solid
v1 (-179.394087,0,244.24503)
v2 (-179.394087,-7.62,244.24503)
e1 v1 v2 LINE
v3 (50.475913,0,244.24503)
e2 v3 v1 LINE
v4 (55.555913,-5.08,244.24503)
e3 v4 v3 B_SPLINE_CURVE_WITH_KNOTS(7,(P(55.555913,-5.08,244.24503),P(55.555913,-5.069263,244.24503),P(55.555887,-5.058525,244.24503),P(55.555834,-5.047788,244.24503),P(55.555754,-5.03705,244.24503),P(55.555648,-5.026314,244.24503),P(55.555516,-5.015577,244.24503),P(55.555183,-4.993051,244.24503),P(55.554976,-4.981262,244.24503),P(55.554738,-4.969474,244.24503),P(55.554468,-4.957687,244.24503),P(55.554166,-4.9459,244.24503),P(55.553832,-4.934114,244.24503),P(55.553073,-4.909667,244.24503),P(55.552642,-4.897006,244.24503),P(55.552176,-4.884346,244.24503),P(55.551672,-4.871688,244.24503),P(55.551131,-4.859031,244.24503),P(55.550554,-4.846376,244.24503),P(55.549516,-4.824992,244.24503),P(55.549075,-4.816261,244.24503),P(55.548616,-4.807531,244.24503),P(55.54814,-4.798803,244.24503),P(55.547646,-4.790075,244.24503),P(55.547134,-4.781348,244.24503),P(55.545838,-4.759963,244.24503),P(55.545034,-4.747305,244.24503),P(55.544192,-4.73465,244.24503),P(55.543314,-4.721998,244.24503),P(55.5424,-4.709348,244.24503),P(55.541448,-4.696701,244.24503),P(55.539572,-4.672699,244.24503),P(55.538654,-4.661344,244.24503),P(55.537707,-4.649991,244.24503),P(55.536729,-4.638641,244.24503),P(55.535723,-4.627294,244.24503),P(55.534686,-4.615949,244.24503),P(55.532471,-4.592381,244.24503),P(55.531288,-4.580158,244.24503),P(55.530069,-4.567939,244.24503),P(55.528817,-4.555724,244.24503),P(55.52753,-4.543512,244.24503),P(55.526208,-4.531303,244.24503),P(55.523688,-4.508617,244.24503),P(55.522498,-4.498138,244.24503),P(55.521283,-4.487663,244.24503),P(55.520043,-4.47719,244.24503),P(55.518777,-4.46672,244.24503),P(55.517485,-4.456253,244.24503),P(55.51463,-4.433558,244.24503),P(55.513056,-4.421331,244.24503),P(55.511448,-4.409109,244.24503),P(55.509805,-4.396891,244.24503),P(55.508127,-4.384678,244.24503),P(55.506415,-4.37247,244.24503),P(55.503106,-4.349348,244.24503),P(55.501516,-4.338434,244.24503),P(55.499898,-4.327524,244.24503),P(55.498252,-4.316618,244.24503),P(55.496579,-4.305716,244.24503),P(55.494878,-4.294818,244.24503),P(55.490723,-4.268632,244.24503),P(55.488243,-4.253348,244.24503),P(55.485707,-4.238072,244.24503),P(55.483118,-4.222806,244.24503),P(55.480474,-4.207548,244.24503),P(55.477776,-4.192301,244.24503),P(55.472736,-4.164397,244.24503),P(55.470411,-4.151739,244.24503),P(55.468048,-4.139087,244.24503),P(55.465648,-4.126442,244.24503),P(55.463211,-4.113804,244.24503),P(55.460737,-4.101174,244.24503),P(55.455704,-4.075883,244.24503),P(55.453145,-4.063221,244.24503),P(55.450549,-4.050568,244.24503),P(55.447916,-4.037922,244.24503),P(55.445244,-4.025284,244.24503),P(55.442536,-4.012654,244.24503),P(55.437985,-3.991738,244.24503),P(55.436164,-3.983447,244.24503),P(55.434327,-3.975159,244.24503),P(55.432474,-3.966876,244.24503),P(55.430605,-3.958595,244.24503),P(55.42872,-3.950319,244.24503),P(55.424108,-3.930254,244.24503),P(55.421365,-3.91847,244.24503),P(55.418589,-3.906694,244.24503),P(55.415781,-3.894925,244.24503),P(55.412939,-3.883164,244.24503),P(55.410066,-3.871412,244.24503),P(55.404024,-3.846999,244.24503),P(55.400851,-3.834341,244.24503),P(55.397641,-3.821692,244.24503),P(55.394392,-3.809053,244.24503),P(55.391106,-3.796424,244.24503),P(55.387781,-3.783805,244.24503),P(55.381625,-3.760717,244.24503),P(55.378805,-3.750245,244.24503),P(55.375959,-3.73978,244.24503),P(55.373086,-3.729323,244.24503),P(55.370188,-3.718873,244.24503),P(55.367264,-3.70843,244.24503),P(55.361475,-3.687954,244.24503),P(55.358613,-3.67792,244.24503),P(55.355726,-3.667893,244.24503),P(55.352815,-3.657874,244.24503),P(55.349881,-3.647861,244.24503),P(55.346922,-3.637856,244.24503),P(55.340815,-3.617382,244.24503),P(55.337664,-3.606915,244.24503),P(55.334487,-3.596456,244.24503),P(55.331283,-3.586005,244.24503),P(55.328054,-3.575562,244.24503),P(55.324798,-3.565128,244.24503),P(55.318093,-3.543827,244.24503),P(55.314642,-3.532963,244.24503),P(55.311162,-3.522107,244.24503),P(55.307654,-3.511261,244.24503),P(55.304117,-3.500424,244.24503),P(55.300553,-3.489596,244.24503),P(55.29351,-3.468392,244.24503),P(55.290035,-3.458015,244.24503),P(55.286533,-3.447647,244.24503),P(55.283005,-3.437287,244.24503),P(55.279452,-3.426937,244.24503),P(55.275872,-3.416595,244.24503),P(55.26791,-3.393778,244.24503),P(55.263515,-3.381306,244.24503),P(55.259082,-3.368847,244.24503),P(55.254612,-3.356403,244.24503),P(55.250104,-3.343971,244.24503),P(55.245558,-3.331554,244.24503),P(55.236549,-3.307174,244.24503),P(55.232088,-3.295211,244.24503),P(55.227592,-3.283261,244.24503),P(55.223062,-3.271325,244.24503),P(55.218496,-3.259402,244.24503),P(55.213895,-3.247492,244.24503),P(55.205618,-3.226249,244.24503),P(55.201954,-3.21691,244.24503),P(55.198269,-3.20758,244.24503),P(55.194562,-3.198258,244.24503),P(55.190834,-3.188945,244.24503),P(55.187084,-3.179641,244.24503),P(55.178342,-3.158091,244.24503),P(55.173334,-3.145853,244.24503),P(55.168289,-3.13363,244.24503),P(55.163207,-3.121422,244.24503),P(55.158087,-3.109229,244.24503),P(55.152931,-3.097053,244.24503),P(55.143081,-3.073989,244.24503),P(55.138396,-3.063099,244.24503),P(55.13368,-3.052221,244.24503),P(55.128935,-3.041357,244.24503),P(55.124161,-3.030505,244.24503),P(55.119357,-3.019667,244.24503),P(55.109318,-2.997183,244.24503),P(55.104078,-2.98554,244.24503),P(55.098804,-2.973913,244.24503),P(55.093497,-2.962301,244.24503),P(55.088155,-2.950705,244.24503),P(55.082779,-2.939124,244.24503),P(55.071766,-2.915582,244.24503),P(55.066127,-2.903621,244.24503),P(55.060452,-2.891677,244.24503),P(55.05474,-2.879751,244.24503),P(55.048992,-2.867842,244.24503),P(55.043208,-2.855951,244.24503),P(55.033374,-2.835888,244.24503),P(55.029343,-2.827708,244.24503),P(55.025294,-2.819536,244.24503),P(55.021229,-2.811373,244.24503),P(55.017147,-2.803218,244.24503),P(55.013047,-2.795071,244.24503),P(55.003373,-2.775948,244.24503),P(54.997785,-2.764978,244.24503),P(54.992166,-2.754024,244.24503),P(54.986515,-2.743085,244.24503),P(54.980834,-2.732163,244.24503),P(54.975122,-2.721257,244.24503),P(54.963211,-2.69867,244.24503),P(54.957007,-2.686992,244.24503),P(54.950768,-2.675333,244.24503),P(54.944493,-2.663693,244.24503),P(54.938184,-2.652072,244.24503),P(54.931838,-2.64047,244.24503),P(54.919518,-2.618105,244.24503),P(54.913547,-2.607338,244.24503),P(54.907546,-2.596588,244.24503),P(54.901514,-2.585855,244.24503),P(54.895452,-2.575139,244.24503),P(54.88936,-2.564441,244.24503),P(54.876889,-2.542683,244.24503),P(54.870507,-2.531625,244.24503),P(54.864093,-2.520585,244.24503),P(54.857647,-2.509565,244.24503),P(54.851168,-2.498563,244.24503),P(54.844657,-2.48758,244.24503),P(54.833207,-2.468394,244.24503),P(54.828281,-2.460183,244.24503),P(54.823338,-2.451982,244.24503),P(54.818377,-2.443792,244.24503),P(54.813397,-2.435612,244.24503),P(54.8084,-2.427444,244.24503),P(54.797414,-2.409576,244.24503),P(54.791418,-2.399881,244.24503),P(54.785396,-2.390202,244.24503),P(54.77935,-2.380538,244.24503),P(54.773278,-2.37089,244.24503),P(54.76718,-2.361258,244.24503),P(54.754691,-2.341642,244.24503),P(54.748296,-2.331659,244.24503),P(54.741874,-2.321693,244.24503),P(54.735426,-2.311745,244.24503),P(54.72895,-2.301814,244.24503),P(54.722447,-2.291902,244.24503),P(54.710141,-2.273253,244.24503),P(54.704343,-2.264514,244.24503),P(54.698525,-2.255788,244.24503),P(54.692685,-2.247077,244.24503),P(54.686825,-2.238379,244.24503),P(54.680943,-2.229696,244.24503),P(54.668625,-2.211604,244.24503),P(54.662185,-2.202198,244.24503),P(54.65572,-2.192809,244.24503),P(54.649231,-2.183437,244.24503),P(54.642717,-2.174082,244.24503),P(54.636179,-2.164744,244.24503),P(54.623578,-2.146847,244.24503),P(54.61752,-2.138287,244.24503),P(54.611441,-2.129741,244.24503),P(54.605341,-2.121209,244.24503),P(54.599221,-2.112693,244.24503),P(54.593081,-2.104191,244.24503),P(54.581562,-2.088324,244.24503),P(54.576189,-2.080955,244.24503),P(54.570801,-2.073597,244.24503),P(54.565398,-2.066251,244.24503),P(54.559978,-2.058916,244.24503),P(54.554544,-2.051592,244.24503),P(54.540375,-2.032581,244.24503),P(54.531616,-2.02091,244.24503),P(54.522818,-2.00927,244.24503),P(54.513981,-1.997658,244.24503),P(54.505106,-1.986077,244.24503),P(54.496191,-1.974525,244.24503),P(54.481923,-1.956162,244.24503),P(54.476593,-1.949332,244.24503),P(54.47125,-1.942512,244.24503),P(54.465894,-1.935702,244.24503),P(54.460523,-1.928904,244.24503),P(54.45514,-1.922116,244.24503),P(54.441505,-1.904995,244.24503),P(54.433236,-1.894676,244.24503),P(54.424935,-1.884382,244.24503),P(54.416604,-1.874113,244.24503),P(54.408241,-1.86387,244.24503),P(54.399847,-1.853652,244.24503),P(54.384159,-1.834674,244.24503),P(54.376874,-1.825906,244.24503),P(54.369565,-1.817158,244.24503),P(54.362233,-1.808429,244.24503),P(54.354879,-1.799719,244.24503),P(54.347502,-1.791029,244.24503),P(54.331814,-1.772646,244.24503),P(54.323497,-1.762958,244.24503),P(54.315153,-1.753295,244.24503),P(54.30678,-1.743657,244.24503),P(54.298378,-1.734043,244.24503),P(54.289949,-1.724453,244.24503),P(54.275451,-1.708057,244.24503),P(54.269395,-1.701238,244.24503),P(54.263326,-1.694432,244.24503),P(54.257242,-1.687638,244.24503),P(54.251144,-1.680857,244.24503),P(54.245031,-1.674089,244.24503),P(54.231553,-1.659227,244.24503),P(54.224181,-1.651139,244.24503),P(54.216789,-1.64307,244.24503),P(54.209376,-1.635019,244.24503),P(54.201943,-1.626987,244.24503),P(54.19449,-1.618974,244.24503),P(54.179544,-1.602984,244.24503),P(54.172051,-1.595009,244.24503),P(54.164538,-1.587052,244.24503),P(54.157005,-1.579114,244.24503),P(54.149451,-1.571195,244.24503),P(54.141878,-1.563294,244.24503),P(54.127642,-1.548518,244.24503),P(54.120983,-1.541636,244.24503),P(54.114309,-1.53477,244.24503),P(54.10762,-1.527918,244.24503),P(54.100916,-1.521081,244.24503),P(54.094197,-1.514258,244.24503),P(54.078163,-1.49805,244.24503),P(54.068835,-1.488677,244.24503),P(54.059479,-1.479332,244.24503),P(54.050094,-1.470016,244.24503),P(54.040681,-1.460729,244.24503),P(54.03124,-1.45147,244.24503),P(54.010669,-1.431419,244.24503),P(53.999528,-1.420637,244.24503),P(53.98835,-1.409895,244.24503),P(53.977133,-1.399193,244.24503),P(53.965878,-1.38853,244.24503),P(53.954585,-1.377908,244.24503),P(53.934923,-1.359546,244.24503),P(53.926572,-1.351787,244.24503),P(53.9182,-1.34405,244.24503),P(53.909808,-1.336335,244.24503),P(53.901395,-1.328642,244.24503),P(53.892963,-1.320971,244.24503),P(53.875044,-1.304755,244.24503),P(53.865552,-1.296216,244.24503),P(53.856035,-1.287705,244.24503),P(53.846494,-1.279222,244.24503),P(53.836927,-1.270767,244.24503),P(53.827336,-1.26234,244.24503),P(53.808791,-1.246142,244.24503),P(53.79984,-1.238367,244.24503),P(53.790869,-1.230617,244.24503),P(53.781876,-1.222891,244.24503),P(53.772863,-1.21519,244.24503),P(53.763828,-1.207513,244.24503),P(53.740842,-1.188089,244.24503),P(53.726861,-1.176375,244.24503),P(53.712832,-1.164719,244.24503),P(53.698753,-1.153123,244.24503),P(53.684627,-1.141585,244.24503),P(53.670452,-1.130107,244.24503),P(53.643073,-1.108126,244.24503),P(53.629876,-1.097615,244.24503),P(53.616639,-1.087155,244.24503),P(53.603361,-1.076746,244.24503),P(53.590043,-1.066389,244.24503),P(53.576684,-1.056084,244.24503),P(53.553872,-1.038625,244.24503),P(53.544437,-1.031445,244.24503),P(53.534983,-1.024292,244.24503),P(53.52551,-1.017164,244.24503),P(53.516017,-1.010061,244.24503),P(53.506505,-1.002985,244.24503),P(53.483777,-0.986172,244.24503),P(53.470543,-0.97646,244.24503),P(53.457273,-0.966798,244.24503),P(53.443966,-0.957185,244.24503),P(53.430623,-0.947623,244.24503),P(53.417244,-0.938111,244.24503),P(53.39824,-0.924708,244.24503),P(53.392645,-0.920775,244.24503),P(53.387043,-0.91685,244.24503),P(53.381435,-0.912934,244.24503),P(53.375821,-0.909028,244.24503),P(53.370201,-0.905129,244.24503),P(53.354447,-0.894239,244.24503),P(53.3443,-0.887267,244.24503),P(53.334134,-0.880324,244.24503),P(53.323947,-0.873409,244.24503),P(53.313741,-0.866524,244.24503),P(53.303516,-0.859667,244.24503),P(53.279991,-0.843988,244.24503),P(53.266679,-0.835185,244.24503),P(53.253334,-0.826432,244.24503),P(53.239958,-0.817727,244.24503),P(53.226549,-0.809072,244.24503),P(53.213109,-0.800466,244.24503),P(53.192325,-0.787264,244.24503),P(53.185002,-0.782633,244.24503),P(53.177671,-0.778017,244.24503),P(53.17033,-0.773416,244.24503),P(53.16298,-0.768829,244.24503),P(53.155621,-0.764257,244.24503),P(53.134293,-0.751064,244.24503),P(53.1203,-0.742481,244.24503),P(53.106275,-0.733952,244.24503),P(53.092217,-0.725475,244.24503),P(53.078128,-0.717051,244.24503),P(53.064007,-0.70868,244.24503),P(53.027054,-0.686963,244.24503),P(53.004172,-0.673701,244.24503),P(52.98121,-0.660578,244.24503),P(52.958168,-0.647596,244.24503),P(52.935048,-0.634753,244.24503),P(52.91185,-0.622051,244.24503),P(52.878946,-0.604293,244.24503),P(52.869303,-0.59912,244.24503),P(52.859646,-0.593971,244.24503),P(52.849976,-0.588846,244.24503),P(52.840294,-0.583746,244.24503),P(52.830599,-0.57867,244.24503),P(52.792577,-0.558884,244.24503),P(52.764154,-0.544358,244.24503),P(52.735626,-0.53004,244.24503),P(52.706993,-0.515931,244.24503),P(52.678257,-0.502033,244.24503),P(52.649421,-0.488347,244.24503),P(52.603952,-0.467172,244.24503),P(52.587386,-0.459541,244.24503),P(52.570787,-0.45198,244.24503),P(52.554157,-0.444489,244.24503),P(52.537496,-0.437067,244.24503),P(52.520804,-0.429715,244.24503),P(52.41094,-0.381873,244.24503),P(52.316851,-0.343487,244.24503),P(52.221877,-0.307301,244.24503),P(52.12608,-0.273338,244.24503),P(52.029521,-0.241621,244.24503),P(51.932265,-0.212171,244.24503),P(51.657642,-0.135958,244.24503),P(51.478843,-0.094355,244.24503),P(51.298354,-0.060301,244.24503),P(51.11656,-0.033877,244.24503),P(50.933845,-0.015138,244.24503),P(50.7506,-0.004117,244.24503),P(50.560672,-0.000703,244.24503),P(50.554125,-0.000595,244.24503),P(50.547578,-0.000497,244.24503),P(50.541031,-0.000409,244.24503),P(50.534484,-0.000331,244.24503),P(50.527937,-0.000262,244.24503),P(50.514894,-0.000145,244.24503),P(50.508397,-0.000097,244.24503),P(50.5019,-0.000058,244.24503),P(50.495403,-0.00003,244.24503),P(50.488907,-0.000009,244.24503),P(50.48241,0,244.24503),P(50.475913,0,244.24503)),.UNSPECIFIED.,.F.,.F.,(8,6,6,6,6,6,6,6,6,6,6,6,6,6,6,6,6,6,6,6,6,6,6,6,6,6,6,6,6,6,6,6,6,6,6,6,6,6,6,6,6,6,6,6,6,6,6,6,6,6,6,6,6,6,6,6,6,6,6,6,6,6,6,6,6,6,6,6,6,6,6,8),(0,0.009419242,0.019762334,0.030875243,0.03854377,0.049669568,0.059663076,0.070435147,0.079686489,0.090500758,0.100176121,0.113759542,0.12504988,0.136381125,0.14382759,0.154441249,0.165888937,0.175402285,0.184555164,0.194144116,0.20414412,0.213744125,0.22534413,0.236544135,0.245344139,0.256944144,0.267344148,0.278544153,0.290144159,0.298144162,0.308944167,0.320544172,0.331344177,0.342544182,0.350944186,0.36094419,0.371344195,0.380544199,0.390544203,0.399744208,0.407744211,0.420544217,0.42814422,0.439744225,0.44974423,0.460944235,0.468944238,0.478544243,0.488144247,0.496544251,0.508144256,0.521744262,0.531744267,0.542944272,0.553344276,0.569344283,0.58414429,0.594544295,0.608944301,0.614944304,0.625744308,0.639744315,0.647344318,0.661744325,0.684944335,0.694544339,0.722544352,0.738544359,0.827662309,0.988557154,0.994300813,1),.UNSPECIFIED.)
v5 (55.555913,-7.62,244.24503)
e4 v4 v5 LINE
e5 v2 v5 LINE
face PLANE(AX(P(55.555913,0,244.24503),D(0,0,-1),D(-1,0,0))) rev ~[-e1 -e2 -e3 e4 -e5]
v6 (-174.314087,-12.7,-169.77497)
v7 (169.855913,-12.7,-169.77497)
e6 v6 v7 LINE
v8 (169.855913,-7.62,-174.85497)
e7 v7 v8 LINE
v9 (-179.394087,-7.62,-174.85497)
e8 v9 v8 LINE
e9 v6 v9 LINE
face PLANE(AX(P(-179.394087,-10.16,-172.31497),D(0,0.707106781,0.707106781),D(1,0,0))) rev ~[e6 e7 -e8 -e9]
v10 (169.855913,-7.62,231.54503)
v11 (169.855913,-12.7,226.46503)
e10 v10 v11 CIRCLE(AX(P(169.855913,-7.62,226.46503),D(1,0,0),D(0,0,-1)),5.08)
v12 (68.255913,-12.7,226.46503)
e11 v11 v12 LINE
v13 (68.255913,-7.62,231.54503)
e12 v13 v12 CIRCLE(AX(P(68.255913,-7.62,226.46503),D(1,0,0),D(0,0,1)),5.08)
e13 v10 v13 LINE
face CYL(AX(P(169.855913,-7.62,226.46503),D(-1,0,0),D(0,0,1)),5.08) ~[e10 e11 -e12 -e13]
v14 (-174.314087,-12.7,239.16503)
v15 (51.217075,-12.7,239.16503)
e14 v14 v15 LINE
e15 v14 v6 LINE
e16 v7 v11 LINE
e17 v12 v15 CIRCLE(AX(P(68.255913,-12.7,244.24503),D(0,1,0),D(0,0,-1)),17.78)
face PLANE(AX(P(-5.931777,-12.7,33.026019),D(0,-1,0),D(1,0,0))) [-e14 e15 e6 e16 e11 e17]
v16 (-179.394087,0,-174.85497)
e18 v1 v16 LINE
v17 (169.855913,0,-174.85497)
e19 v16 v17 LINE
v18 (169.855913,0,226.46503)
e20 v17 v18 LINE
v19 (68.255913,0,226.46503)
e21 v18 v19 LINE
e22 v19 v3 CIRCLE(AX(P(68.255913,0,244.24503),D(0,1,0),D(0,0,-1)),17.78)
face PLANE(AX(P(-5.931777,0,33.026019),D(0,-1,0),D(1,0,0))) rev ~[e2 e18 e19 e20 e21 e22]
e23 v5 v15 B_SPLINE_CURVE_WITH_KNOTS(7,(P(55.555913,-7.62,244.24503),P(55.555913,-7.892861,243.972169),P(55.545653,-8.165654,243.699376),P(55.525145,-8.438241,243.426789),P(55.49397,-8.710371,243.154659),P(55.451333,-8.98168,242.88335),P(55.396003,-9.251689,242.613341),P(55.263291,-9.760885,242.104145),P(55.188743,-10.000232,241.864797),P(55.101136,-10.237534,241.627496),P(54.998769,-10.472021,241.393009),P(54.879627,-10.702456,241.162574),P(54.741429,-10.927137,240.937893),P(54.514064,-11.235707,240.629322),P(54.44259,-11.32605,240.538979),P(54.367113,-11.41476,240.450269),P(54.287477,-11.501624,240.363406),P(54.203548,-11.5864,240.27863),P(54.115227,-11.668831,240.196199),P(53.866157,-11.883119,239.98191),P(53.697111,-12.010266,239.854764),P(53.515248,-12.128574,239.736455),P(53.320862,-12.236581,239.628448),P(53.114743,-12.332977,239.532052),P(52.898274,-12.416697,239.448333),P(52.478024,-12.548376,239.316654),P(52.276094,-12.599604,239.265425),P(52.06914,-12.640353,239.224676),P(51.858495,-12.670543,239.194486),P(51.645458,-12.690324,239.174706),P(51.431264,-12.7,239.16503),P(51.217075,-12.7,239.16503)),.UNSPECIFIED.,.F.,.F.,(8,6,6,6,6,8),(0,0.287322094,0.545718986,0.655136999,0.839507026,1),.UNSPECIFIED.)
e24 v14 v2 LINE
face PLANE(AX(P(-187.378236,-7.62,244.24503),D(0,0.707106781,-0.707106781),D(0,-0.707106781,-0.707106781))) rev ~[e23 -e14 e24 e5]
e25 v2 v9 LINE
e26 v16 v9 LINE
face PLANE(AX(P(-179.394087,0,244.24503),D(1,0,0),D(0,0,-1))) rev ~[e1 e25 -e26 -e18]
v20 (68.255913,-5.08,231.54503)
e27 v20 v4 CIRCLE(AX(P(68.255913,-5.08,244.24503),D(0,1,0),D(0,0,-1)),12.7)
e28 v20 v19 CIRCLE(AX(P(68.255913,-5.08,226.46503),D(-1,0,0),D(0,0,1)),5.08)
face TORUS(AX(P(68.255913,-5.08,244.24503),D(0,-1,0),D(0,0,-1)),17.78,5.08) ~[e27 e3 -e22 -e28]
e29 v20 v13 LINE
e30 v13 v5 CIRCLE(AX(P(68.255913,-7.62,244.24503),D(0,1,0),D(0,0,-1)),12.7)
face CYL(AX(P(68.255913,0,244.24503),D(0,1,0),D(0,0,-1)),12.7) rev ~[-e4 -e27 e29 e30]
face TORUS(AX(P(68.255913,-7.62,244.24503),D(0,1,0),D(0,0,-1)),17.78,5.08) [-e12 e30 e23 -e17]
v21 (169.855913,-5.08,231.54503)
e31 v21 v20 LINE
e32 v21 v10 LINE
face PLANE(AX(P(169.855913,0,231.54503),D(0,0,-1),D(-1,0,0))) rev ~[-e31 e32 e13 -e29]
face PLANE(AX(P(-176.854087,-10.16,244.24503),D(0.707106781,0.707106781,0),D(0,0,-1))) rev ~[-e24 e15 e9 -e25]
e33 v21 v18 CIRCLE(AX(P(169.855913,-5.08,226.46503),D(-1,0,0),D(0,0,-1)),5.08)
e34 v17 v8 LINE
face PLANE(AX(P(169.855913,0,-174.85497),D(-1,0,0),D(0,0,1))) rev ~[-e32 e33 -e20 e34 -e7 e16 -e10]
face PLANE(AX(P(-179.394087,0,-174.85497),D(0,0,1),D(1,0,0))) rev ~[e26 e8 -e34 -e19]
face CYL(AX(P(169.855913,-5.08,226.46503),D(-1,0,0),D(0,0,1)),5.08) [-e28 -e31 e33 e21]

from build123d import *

# Parameters (mm, degrees)
F1_DEPTH    = 12.7
F2_R        = 5.08
F3_SIZE     = 5.08
F4_T1_DEPTH = 250.9182991577


# Not quite as in the source:
# - a fillet or chamfer that OpenCascade refuses, or shapes differently, is made with other operations: its cross-section is extruded or revolved along the edge and cut away or added


with BuildPart() as f1:
    # F0 (on Front) → F1 (new body)
    with BuildSketch(Plane.XZ):
        with BuildLine():
            Line((55.5559131622, 244.2450298561), (-179.3940868378, 244.2450298561))
            Line((-179.3940868378, 244.2450298561), (-179.3940868378, -174.8549701439))
            Line((-179.3940868378, -174.8549701439), (169.8559131622, -174.8549701439))
            Line((169.8559131622, -174.8549701439), (169.8559131622, 231.5450298561))
            Line((169.8559131622, 231.5450298561), (68.2559131622, 231.5450298561))
            ThreePointArc((68.2559131622, 231.5450298561), (59.2756570412, 235.264773735), (55.5559131622, 244.2450298561))
        make_face()
    extrude(amount=F1_DEPTH)

    # F2
    f2_edges = [f1.edges().sort_by_distance(p)[0] for p in [
        (119.055913, 0, 231.54503),
        (119.055913, -12.7, 231.54503),
        (59.275657, 0, 235.264774),
        (59.275657, -12.7, 235.264774),
    ]]
    fillet(f2_edges, radius=F2_R)

    # F3
    f3_edges = [f1.edges().sort_by_distance(p)[0] for p in [
        (-179.394087, -12.7, 34.69503),
        (-4.769087, -12.7, -174.85497),
    ]]
    chamfer(f3_edges, length=F3_SIZE)

    # F4: chamfer of 5.08 on 1 edges, made by hand

    # F4_s2 → F4_t1 (cut)
    with BuildSketch(Plane.YZ.offset(-187.3782364166)):
        Polygon((-7.62, 244.2450298561), (-12.7, 239.1650298561), (-12.7, 244.2450298561), align=None)
    extrude(amount=F4_T1_DEPTH, mode=Mode.SUBTRACT)


solid = f1.part
